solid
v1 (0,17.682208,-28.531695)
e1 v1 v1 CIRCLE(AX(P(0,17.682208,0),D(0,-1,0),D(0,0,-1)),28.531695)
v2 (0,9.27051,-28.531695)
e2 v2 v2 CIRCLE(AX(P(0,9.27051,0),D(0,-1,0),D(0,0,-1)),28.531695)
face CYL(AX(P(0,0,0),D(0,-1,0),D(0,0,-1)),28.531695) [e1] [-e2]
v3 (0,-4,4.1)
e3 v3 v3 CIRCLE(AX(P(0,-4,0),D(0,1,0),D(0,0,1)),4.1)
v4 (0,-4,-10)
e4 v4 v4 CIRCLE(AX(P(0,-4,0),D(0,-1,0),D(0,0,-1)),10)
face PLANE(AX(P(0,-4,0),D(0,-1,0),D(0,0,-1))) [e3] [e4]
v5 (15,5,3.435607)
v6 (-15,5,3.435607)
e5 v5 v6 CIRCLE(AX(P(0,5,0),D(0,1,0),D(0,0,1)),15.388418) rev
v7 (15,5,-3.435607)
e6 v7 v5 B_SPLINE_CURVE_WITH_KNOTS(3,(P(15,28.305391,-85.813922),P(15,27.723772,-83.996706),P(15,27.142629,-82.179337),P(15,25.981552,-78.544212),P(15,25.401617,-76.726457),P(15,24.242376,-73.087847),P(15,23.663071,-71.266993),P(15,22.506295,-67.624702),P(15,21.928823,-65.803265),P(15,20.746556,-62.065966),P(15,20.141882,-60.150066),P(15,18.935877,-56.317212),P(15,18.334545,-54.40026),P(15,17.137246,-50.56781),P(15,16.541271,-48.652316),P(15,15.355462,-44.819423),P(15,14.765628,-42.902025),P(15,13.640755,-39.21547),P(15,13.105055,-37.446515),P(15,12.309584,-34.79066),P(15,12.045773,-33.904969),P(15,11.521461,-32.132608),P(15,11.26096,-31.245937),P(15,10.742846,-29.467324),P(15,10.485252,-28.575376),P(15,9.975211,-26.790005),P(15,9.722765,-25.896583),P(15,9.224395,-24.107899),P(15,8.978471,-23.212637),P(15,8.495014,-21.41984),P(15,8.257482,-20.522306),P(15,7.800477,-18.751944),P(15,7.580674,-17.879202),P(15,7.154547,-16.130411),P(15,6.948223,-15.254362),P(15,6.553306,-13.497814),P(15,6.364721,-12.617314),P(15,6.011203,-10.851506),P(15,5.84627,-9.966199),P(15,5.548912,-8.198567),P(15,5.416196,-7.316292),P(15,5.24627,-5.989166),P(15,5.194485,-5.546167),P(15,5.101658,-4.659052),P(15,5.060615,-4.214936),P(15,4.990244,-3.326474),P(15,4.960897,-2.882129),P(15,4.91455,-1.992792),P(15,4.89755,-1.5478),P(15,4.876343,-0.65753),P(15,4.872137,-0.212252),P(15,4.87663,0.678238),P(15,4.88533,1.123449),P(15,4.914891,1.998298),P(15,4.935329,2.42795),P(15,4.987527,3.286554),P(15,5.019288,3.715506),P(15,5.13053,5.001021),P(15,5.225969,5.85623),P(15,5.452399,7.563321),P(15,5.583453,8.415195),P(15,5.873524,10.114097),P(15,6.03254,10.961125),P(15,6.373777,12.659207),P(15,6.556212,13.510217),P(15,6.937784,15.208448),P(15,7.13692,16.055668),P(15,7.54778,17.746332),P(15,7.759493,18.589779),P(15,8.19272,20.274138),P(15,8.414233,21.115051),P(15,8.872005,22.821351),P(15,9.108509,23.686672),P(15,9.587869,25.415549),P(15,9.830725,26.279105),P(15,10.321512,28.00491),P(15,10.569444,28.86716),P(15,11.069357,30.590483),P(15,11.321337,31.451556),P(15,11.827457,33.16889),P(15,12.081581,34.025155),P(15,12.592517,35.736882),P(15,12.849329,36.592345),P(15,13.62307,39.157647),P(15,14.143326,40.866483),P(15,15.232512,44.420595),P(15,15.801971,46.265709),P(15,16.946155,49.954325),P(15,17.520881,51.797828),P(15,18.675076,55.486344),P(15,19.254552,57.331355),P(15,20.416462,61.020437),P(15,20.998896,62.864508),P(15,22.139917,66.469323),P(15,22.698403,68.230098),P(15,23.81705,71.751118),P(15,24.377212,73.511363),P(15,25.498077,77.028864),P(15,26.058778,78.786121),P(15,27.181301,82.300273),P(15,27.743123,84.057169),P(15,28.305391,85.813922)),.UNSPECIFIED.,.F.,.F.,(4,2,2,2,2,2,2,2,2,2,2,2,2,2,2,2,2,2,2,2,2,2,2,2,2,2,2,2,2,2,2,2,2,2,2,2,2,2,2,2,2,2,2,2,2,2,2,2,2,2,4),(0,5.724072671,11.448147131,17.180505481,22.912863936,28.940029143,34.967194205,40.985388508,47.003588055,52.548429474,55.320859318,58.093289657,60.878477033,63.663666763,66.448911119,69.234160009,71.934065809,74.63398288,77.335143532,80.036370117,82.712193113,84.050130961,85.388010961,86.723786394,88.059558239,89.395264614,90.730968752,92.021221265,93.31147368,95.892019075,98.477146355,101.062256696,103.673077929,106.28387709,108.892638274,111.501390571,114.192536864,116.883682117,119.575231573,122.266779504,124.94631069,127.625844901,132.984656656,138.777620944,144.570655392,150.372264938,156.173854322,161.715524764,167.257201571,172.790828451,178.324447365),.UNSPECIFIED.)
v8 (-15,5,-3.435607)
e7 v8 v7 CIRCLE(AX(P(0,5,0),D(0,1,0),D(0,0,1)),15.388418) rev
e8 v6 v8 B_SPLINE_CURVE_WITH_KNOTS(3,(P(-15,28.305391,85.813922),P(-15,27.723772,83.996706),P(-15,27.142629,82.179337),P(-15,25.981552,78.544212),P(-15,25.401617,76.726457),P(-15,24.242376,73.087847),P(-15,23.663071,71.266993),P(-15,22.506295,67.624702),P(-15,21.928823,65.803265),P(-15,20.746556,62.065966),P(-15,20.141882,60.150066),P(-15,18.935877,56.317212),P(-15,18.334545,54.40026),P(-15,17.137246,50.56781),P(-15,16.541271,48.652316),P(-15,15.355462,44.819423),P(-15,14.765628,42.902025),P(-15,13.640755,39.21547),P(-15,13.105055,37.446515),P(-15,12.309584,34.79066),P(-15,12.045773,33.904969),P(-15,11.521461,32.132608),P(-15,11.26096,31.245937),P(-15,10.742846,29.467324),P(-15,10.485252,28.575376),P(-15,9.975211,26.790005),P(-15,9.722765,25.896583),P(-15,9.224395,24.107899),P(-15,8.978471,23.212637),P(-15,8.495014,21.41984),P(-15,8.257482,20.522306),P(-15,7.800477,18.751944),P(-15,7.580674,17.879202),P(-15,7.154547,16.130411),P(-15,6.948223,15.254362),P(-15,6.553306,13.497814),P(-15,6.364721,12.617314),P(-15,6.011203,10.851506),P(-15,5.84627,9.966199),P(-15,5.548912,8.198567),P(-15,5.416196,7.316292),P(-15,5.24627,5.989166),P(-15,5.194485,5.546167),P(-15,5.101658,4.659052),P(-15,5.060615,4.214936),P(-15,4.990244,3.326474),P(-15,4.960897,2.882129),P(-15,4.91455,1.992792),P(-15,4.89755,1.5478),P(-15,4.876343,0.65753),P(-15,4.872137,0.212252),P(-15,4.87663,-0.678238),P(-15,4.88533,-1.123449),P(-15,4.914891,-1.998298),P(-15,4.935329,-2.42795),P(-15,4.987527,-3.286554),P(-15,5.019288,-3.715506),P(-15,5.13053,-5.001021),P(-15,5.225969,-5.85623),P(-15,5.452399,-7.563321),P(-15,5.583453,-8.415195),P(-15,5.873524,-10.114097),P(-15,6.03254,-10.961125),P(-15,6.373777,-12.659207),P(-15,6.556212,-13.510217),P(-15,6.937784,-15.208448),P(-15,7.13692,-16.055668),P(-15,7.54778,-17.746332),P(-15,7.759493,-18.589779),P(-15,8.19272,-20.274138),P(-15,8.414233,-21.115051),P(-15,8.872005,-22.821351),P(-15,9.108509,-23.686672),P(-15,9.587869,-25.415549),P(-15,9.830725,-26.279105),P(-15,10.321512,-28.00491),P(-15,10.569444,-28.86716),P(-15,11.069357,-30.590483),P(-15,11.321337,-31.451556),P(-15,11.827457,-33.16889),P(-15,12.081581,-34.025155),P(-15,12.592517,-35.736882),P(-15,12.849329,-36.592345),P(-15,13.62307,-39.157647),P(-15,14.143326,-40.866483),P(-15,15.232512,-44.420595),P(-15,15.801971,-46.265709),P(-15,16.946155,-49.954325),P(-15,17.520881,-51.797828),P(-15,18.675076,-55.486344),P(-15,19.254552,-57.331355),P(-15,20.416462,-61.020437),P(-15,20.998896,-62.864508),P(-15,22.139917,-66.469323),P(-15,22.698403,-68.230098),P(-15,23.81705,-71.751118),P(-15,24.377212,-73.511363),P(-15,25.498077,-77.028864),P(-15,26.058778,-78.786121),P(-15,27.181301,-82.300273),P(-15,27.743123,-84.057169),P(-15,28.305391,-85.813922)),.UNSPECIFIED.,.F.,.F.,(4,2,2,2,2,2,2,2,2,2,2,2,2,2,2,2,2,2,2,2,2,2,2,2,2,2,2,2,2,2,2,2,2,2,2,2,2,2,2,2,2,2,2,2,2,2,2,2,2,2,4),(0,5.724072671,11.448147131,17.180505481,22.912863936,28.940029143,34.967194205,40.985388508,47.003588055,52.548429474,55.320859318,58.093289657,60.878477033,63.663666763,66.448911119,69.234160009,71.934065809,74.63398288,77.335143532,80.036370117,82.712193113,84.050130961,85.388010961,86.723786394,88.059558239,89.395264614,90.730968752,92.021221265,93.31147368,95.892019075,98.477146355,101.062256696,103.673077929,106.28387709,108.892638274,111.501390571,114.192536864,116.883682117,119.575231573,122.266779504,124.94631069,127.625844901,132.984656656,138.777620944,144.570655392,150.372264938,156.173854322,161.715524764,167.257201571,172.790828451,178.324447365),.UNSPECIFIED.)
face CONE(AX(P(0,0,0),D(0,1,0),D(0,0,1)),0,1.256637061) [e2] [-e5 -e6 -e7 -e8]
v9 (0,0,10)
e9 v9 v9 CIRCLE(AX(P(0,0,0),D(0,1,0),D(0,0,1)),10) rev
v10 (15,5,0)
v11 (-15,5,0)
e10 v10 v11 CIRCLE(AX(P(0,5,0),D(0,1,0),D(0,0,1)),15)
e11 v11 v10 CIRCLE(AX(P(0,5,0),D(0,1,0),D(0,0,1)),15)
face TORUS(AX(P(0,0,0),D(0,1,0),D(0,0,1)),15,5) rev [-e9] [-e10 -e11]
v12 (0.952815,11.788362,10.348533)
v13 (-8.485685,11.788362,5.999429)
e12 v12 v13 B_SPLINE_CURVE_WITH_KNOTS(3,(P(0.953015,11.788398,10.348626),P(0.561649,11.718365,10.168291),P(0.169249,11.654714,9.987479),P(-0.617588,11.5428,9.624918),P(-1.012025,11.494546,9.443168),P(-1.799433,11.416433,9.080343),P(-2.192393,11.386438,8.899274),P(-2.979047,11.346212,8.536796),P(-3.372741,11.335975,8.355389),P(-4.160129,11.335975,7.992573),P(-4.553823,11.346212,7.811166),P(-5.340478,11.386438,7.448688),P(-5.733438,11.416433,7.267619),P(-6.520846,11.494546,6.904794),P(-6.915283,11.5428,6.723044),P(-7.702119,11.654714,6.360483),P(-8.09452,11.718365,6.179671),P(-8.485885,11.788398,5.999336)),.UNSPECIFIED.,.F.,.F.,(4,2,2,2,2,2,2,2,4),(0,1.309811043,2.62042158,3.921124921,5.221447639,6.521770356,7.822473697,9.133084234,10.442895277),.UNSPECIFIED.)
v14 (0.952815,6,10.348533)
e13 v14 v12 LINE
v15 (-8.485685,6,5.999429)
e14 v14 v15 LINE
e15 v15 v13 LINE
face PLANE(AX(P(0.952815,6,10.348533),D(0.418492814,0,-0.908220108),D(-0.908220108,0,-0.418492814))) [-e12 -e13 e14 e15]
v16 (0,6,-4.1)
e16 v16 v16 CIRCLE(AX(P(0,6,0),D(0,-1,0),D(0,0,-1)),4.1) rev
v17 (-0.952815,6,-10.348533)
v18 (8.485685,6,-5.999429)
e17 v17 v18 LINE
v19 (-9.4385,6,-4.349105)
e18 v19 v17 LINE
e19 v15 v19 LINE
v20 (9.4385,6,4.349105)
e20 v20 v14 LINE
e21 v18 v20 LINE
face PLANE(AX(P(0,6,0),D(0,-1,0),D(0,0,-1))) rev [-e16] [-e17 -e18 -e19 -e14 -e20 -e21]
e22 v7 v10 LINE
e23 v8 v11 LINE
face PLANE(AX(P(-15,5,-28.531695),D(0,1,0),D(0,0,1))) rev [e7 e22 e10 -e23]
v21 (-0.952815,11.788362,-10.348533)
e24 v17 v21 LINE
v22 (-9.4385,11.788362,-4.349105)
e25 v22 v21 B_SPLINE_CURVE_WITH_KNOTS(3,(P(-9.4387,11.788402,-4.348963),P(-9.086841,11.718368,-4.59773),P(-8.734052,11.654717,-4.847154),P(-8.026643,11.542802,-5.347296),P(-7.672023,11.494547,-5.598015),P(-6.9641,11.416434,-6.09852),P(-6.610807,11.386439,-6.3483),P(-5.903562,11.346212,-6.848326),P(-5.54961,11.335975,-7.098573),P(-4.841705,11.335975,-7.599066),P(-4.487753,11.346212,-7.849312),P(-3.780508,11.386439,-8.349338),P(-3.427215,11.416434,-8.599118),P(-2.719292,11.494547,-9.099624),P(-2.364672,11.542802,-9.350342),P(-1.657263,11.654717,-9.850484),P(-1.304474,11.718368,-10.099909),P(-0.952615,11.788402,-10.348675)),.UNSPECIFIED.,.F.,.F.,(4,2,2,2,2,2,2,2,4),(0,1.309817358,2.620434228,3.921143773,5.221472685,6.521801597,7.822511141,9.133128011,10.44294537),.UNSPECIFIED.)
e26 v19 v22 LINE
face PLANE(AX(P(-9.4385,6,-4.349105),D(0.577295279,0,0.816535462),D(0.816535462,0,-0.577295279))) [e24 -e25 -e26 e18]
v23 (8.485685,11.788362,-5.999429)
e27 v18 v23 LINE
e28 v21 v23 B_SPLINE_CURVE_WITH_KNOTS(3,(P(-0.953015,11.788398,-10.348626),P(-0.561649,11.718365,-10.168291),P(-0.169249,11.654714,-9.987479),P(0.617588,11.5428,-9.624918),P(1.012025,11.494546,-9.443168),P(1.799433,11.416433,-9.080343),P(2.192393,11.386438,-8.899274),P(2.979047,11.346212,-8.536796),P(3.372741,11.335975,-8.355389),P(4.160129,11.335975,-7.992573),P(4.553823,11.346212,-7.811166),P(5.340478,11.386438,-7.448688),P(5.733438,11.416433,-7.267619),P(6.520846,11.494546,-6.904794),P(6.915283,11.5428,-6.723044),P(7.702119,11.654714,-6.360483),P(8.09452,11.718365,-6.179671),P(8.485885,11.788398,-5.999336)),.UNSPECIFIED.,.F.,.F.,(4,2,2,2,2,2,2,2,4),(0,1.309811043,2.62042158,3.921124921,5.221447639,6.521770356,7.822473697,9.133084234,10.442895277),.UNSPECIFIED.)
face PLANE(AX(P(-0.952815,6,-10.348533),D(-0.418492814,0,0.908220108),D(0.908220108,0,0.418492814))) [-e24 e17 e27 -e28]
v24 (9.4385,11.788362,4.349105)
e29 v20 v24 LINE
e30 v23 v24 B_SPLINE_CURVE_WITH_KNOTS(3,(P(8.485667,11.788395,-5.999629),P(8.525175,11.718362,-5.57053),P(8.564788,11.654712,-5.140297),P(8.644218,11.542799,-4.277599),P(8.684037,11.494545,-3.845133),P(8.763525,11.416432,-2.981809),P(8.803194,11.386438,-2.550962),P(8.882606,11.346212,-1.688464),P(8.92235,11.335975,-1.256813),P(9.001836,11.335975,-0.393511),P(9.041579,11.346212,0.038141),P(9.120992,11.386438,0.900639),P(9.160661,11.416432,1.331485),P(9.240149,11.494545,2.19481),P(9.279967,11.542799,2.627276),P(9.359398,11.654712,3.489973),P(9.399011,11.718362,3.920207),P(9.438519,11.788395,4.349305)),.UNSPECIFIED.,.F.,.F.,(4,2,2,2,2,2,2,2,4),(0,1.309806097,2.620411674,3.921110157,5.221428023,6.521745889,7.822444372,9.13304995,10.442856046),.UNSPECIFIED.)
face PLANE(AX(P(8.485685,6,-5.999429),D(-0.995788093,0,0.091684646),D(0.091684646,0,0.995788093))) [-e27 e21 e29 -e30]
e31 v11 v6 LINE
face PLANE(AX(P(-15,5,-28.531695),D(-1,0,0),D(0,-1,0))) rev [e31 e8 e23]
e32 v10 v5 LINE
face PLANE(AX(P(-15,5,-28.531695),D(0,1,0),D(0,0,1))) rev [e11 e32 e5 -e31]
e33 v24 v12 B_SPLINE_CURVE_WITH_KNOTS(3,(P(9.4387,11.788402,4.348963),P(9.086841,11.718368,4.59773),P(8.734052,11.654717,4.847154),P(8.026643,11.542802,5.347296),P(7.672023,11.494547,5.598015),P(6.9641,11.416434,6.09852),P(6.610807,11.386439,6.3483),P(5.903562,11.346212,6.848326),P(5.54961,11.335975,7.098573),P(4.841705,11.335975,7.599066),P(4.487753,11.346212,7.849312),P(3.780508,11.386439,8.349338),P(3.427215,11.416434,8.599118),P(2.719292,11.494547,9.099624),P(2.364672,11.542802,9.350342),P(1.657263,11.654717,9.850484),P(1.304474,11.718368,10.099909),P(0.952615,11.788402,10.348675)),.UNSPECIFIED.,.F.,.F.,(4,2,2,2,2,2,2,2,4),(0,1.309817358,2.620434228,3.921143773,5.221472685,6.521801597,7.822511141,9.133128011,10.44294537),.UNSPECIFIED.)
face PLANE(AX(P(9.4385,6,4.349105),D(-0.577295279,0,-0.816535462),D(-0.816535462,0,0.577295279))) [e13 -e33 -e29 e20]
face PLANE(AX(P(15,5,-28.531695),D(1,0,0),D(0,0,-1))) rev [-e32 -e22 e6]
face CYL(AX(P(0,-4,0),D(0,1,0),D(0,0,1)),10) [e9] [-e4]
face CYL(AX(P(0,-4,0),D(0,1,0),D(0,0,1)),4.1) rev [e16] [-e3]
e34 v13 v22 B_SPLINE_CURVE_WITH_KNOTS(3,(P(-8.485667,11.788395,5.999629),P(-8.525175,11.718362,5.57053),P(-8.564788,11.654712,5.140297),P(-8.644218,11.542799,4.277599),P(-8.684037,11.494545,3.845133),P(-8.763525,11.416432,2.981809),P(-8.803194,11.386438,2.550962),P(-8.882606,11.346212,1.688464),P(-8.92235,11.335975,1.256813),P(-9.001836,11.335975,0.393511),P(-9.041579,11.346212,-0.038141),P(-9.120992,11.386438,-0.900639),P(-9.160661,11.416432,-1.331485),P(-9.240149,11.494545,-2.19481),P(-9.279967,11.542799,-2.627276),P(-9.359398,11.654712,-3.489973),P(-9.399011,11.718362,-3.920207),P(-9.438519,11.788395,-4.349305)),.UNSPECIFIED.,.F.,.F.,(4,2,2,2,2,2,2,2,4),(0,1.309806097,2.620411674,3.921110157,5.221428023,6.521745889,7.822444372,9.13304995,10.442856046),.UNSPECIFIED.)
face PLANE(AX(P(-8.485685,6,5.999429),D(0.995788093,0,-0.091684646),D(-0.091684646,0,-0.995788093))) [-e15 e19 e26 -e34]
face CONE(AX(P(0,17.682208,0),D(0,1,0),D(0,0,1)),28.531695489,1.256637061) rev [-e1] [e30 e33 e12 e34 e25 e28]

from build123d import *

# Parameters (mm, degrees)
CUT_EXTRUDE_1_DEPTH      = 45.054236589
CUT_EXTRUDE_1_DEPTH_BACK = 45.054236589
SKETCH_2_W               = 30
SKETCH_2_H               = 10
SKETCH_3_R               = 3
CUT_EXTRUDE_2_DEPTH      = 43.296024461
SKETCH_5_R               = 10
EXTRUDE_1_DEPTH          = 9
CUT_EXTRUDE_7_DEPTH      = 43.296024461
CUT_EXTRUDE_7_DEPTH_BACK = 43.296024461
SKETCH_6_R               = 4.1
FILLET_2_R               = 5
CUT_EXTRUDE_8_DEPTH      = 4
CUT_EXTRUDE_8_DEPTH_BACK = 12


with BuildPart() as part:
    # 草图1 → 旋转2 (revolve)
    with BuildSketch(Plane.XY, mode=Mode.PRIVATE) as revolve_2_sk:
        Polygon((0, 0), (0, 8.411697794), (28.531695489, 17.682207625), (28.531695489, 9.270509831), align=None)
    revolve(revolve_2_sk.sketch.rotate(Axis((0, 0, 0), (0, 1, 0)), 270), axis=Axis((0, 0, 0), (0, 1, 0)))

    # 草图2 → 切除-拉伸1 (cut, two sides: drawn at the far end of the back side and taken through both)
    with BuildSketch(Plane.XY.offset(-CUT_EXTRUDE_1_DEPTH_BACK)):
        Rectangle(SKETCH_2_W, SKETCH_2_H)
    extrude(amount=CUT_EXTRUDE_1_DEPTH + CUT_EXTRUDE_1_DEPTH_BACK, mode=Mode.SUBTRACT)

    # 草图3 → 切除-拉伸2 (cut, through all)
    with BuildSketch(Plane.XZ.offset(-5)):
        with Locations(Location((0, 0, 0), (0, 0, 270))):
            Circle(SKETCH_3_R)
    extrude(amount=-CUT_EXTRUDE_2_DEPTH, mode=Mode.SUBTRACT)

    # 草图5 → 凸台-拉伸1 (add)
    with BuildSketch(Plane.XZ.offset(-5)):
        with Locations(Location((0, 0, 0), (0, 0, 90))):
            Circle(SKETCH_5_R)
    extrude(amount=EXTRUDE_1_DEPTH)

    # 草图6 → 切除-拉伸7 (cut, two sides: drawn at the far end of the back side and taken through both)
    with BuildSketch(Plane(origin=(0, 5, 0), x_dir=(1, 0, 0), z_dir=(0, 1, 0)).offset(-CUT_EXTRUDE_7_DEPTH_BACK)):
        with Locations(Location((0, 0, 0), (0, 0, 270))):
            Circle(SKETCH_6_R)
    extrude(amount=CUT_EXTRUDE_7_DEPTH + CUT_EXTRUDE_7_DEPTH_BACK, mode=Mode.SUBTRACT)

    # 圆角2
    fillet_2_edges = [part.edges().sort_by_distance(p)[0] for p in [
        (0, 5, -10),
    ]]
    fillet(fillet_2_edges, radius=FILLET_2_R - 0.0001)  # a hair under: the kernel refuses the full size

    # 草图9 → 切除-拉伸8 (cut, two sides: drawn at the far end of the back side and taken through both)
    with BuildSketch(Plane(origin=(0, 10, 0), x_dir=(-1, 0, 0), z_dir=(0, -1, 0)).offset(-CUT_EXTRUDE_8_DEPTH_BACK)):
        Polygon((8.48568544, -5.999428524), (9.43850023, 4.349104898), (0.95281479, 10.348533422), (-8.48568544, 5.999428524), (-9.43850023, -4.349104898), (-0.95281479, -10.348533422), align=None)
    extrude(amount=CUT_EXTRUDE_8_DEPTH + CUT_EXTRUDE_8_DEPTH_BACK, mode=Mode.SUBTRACT)


solid = part.part
